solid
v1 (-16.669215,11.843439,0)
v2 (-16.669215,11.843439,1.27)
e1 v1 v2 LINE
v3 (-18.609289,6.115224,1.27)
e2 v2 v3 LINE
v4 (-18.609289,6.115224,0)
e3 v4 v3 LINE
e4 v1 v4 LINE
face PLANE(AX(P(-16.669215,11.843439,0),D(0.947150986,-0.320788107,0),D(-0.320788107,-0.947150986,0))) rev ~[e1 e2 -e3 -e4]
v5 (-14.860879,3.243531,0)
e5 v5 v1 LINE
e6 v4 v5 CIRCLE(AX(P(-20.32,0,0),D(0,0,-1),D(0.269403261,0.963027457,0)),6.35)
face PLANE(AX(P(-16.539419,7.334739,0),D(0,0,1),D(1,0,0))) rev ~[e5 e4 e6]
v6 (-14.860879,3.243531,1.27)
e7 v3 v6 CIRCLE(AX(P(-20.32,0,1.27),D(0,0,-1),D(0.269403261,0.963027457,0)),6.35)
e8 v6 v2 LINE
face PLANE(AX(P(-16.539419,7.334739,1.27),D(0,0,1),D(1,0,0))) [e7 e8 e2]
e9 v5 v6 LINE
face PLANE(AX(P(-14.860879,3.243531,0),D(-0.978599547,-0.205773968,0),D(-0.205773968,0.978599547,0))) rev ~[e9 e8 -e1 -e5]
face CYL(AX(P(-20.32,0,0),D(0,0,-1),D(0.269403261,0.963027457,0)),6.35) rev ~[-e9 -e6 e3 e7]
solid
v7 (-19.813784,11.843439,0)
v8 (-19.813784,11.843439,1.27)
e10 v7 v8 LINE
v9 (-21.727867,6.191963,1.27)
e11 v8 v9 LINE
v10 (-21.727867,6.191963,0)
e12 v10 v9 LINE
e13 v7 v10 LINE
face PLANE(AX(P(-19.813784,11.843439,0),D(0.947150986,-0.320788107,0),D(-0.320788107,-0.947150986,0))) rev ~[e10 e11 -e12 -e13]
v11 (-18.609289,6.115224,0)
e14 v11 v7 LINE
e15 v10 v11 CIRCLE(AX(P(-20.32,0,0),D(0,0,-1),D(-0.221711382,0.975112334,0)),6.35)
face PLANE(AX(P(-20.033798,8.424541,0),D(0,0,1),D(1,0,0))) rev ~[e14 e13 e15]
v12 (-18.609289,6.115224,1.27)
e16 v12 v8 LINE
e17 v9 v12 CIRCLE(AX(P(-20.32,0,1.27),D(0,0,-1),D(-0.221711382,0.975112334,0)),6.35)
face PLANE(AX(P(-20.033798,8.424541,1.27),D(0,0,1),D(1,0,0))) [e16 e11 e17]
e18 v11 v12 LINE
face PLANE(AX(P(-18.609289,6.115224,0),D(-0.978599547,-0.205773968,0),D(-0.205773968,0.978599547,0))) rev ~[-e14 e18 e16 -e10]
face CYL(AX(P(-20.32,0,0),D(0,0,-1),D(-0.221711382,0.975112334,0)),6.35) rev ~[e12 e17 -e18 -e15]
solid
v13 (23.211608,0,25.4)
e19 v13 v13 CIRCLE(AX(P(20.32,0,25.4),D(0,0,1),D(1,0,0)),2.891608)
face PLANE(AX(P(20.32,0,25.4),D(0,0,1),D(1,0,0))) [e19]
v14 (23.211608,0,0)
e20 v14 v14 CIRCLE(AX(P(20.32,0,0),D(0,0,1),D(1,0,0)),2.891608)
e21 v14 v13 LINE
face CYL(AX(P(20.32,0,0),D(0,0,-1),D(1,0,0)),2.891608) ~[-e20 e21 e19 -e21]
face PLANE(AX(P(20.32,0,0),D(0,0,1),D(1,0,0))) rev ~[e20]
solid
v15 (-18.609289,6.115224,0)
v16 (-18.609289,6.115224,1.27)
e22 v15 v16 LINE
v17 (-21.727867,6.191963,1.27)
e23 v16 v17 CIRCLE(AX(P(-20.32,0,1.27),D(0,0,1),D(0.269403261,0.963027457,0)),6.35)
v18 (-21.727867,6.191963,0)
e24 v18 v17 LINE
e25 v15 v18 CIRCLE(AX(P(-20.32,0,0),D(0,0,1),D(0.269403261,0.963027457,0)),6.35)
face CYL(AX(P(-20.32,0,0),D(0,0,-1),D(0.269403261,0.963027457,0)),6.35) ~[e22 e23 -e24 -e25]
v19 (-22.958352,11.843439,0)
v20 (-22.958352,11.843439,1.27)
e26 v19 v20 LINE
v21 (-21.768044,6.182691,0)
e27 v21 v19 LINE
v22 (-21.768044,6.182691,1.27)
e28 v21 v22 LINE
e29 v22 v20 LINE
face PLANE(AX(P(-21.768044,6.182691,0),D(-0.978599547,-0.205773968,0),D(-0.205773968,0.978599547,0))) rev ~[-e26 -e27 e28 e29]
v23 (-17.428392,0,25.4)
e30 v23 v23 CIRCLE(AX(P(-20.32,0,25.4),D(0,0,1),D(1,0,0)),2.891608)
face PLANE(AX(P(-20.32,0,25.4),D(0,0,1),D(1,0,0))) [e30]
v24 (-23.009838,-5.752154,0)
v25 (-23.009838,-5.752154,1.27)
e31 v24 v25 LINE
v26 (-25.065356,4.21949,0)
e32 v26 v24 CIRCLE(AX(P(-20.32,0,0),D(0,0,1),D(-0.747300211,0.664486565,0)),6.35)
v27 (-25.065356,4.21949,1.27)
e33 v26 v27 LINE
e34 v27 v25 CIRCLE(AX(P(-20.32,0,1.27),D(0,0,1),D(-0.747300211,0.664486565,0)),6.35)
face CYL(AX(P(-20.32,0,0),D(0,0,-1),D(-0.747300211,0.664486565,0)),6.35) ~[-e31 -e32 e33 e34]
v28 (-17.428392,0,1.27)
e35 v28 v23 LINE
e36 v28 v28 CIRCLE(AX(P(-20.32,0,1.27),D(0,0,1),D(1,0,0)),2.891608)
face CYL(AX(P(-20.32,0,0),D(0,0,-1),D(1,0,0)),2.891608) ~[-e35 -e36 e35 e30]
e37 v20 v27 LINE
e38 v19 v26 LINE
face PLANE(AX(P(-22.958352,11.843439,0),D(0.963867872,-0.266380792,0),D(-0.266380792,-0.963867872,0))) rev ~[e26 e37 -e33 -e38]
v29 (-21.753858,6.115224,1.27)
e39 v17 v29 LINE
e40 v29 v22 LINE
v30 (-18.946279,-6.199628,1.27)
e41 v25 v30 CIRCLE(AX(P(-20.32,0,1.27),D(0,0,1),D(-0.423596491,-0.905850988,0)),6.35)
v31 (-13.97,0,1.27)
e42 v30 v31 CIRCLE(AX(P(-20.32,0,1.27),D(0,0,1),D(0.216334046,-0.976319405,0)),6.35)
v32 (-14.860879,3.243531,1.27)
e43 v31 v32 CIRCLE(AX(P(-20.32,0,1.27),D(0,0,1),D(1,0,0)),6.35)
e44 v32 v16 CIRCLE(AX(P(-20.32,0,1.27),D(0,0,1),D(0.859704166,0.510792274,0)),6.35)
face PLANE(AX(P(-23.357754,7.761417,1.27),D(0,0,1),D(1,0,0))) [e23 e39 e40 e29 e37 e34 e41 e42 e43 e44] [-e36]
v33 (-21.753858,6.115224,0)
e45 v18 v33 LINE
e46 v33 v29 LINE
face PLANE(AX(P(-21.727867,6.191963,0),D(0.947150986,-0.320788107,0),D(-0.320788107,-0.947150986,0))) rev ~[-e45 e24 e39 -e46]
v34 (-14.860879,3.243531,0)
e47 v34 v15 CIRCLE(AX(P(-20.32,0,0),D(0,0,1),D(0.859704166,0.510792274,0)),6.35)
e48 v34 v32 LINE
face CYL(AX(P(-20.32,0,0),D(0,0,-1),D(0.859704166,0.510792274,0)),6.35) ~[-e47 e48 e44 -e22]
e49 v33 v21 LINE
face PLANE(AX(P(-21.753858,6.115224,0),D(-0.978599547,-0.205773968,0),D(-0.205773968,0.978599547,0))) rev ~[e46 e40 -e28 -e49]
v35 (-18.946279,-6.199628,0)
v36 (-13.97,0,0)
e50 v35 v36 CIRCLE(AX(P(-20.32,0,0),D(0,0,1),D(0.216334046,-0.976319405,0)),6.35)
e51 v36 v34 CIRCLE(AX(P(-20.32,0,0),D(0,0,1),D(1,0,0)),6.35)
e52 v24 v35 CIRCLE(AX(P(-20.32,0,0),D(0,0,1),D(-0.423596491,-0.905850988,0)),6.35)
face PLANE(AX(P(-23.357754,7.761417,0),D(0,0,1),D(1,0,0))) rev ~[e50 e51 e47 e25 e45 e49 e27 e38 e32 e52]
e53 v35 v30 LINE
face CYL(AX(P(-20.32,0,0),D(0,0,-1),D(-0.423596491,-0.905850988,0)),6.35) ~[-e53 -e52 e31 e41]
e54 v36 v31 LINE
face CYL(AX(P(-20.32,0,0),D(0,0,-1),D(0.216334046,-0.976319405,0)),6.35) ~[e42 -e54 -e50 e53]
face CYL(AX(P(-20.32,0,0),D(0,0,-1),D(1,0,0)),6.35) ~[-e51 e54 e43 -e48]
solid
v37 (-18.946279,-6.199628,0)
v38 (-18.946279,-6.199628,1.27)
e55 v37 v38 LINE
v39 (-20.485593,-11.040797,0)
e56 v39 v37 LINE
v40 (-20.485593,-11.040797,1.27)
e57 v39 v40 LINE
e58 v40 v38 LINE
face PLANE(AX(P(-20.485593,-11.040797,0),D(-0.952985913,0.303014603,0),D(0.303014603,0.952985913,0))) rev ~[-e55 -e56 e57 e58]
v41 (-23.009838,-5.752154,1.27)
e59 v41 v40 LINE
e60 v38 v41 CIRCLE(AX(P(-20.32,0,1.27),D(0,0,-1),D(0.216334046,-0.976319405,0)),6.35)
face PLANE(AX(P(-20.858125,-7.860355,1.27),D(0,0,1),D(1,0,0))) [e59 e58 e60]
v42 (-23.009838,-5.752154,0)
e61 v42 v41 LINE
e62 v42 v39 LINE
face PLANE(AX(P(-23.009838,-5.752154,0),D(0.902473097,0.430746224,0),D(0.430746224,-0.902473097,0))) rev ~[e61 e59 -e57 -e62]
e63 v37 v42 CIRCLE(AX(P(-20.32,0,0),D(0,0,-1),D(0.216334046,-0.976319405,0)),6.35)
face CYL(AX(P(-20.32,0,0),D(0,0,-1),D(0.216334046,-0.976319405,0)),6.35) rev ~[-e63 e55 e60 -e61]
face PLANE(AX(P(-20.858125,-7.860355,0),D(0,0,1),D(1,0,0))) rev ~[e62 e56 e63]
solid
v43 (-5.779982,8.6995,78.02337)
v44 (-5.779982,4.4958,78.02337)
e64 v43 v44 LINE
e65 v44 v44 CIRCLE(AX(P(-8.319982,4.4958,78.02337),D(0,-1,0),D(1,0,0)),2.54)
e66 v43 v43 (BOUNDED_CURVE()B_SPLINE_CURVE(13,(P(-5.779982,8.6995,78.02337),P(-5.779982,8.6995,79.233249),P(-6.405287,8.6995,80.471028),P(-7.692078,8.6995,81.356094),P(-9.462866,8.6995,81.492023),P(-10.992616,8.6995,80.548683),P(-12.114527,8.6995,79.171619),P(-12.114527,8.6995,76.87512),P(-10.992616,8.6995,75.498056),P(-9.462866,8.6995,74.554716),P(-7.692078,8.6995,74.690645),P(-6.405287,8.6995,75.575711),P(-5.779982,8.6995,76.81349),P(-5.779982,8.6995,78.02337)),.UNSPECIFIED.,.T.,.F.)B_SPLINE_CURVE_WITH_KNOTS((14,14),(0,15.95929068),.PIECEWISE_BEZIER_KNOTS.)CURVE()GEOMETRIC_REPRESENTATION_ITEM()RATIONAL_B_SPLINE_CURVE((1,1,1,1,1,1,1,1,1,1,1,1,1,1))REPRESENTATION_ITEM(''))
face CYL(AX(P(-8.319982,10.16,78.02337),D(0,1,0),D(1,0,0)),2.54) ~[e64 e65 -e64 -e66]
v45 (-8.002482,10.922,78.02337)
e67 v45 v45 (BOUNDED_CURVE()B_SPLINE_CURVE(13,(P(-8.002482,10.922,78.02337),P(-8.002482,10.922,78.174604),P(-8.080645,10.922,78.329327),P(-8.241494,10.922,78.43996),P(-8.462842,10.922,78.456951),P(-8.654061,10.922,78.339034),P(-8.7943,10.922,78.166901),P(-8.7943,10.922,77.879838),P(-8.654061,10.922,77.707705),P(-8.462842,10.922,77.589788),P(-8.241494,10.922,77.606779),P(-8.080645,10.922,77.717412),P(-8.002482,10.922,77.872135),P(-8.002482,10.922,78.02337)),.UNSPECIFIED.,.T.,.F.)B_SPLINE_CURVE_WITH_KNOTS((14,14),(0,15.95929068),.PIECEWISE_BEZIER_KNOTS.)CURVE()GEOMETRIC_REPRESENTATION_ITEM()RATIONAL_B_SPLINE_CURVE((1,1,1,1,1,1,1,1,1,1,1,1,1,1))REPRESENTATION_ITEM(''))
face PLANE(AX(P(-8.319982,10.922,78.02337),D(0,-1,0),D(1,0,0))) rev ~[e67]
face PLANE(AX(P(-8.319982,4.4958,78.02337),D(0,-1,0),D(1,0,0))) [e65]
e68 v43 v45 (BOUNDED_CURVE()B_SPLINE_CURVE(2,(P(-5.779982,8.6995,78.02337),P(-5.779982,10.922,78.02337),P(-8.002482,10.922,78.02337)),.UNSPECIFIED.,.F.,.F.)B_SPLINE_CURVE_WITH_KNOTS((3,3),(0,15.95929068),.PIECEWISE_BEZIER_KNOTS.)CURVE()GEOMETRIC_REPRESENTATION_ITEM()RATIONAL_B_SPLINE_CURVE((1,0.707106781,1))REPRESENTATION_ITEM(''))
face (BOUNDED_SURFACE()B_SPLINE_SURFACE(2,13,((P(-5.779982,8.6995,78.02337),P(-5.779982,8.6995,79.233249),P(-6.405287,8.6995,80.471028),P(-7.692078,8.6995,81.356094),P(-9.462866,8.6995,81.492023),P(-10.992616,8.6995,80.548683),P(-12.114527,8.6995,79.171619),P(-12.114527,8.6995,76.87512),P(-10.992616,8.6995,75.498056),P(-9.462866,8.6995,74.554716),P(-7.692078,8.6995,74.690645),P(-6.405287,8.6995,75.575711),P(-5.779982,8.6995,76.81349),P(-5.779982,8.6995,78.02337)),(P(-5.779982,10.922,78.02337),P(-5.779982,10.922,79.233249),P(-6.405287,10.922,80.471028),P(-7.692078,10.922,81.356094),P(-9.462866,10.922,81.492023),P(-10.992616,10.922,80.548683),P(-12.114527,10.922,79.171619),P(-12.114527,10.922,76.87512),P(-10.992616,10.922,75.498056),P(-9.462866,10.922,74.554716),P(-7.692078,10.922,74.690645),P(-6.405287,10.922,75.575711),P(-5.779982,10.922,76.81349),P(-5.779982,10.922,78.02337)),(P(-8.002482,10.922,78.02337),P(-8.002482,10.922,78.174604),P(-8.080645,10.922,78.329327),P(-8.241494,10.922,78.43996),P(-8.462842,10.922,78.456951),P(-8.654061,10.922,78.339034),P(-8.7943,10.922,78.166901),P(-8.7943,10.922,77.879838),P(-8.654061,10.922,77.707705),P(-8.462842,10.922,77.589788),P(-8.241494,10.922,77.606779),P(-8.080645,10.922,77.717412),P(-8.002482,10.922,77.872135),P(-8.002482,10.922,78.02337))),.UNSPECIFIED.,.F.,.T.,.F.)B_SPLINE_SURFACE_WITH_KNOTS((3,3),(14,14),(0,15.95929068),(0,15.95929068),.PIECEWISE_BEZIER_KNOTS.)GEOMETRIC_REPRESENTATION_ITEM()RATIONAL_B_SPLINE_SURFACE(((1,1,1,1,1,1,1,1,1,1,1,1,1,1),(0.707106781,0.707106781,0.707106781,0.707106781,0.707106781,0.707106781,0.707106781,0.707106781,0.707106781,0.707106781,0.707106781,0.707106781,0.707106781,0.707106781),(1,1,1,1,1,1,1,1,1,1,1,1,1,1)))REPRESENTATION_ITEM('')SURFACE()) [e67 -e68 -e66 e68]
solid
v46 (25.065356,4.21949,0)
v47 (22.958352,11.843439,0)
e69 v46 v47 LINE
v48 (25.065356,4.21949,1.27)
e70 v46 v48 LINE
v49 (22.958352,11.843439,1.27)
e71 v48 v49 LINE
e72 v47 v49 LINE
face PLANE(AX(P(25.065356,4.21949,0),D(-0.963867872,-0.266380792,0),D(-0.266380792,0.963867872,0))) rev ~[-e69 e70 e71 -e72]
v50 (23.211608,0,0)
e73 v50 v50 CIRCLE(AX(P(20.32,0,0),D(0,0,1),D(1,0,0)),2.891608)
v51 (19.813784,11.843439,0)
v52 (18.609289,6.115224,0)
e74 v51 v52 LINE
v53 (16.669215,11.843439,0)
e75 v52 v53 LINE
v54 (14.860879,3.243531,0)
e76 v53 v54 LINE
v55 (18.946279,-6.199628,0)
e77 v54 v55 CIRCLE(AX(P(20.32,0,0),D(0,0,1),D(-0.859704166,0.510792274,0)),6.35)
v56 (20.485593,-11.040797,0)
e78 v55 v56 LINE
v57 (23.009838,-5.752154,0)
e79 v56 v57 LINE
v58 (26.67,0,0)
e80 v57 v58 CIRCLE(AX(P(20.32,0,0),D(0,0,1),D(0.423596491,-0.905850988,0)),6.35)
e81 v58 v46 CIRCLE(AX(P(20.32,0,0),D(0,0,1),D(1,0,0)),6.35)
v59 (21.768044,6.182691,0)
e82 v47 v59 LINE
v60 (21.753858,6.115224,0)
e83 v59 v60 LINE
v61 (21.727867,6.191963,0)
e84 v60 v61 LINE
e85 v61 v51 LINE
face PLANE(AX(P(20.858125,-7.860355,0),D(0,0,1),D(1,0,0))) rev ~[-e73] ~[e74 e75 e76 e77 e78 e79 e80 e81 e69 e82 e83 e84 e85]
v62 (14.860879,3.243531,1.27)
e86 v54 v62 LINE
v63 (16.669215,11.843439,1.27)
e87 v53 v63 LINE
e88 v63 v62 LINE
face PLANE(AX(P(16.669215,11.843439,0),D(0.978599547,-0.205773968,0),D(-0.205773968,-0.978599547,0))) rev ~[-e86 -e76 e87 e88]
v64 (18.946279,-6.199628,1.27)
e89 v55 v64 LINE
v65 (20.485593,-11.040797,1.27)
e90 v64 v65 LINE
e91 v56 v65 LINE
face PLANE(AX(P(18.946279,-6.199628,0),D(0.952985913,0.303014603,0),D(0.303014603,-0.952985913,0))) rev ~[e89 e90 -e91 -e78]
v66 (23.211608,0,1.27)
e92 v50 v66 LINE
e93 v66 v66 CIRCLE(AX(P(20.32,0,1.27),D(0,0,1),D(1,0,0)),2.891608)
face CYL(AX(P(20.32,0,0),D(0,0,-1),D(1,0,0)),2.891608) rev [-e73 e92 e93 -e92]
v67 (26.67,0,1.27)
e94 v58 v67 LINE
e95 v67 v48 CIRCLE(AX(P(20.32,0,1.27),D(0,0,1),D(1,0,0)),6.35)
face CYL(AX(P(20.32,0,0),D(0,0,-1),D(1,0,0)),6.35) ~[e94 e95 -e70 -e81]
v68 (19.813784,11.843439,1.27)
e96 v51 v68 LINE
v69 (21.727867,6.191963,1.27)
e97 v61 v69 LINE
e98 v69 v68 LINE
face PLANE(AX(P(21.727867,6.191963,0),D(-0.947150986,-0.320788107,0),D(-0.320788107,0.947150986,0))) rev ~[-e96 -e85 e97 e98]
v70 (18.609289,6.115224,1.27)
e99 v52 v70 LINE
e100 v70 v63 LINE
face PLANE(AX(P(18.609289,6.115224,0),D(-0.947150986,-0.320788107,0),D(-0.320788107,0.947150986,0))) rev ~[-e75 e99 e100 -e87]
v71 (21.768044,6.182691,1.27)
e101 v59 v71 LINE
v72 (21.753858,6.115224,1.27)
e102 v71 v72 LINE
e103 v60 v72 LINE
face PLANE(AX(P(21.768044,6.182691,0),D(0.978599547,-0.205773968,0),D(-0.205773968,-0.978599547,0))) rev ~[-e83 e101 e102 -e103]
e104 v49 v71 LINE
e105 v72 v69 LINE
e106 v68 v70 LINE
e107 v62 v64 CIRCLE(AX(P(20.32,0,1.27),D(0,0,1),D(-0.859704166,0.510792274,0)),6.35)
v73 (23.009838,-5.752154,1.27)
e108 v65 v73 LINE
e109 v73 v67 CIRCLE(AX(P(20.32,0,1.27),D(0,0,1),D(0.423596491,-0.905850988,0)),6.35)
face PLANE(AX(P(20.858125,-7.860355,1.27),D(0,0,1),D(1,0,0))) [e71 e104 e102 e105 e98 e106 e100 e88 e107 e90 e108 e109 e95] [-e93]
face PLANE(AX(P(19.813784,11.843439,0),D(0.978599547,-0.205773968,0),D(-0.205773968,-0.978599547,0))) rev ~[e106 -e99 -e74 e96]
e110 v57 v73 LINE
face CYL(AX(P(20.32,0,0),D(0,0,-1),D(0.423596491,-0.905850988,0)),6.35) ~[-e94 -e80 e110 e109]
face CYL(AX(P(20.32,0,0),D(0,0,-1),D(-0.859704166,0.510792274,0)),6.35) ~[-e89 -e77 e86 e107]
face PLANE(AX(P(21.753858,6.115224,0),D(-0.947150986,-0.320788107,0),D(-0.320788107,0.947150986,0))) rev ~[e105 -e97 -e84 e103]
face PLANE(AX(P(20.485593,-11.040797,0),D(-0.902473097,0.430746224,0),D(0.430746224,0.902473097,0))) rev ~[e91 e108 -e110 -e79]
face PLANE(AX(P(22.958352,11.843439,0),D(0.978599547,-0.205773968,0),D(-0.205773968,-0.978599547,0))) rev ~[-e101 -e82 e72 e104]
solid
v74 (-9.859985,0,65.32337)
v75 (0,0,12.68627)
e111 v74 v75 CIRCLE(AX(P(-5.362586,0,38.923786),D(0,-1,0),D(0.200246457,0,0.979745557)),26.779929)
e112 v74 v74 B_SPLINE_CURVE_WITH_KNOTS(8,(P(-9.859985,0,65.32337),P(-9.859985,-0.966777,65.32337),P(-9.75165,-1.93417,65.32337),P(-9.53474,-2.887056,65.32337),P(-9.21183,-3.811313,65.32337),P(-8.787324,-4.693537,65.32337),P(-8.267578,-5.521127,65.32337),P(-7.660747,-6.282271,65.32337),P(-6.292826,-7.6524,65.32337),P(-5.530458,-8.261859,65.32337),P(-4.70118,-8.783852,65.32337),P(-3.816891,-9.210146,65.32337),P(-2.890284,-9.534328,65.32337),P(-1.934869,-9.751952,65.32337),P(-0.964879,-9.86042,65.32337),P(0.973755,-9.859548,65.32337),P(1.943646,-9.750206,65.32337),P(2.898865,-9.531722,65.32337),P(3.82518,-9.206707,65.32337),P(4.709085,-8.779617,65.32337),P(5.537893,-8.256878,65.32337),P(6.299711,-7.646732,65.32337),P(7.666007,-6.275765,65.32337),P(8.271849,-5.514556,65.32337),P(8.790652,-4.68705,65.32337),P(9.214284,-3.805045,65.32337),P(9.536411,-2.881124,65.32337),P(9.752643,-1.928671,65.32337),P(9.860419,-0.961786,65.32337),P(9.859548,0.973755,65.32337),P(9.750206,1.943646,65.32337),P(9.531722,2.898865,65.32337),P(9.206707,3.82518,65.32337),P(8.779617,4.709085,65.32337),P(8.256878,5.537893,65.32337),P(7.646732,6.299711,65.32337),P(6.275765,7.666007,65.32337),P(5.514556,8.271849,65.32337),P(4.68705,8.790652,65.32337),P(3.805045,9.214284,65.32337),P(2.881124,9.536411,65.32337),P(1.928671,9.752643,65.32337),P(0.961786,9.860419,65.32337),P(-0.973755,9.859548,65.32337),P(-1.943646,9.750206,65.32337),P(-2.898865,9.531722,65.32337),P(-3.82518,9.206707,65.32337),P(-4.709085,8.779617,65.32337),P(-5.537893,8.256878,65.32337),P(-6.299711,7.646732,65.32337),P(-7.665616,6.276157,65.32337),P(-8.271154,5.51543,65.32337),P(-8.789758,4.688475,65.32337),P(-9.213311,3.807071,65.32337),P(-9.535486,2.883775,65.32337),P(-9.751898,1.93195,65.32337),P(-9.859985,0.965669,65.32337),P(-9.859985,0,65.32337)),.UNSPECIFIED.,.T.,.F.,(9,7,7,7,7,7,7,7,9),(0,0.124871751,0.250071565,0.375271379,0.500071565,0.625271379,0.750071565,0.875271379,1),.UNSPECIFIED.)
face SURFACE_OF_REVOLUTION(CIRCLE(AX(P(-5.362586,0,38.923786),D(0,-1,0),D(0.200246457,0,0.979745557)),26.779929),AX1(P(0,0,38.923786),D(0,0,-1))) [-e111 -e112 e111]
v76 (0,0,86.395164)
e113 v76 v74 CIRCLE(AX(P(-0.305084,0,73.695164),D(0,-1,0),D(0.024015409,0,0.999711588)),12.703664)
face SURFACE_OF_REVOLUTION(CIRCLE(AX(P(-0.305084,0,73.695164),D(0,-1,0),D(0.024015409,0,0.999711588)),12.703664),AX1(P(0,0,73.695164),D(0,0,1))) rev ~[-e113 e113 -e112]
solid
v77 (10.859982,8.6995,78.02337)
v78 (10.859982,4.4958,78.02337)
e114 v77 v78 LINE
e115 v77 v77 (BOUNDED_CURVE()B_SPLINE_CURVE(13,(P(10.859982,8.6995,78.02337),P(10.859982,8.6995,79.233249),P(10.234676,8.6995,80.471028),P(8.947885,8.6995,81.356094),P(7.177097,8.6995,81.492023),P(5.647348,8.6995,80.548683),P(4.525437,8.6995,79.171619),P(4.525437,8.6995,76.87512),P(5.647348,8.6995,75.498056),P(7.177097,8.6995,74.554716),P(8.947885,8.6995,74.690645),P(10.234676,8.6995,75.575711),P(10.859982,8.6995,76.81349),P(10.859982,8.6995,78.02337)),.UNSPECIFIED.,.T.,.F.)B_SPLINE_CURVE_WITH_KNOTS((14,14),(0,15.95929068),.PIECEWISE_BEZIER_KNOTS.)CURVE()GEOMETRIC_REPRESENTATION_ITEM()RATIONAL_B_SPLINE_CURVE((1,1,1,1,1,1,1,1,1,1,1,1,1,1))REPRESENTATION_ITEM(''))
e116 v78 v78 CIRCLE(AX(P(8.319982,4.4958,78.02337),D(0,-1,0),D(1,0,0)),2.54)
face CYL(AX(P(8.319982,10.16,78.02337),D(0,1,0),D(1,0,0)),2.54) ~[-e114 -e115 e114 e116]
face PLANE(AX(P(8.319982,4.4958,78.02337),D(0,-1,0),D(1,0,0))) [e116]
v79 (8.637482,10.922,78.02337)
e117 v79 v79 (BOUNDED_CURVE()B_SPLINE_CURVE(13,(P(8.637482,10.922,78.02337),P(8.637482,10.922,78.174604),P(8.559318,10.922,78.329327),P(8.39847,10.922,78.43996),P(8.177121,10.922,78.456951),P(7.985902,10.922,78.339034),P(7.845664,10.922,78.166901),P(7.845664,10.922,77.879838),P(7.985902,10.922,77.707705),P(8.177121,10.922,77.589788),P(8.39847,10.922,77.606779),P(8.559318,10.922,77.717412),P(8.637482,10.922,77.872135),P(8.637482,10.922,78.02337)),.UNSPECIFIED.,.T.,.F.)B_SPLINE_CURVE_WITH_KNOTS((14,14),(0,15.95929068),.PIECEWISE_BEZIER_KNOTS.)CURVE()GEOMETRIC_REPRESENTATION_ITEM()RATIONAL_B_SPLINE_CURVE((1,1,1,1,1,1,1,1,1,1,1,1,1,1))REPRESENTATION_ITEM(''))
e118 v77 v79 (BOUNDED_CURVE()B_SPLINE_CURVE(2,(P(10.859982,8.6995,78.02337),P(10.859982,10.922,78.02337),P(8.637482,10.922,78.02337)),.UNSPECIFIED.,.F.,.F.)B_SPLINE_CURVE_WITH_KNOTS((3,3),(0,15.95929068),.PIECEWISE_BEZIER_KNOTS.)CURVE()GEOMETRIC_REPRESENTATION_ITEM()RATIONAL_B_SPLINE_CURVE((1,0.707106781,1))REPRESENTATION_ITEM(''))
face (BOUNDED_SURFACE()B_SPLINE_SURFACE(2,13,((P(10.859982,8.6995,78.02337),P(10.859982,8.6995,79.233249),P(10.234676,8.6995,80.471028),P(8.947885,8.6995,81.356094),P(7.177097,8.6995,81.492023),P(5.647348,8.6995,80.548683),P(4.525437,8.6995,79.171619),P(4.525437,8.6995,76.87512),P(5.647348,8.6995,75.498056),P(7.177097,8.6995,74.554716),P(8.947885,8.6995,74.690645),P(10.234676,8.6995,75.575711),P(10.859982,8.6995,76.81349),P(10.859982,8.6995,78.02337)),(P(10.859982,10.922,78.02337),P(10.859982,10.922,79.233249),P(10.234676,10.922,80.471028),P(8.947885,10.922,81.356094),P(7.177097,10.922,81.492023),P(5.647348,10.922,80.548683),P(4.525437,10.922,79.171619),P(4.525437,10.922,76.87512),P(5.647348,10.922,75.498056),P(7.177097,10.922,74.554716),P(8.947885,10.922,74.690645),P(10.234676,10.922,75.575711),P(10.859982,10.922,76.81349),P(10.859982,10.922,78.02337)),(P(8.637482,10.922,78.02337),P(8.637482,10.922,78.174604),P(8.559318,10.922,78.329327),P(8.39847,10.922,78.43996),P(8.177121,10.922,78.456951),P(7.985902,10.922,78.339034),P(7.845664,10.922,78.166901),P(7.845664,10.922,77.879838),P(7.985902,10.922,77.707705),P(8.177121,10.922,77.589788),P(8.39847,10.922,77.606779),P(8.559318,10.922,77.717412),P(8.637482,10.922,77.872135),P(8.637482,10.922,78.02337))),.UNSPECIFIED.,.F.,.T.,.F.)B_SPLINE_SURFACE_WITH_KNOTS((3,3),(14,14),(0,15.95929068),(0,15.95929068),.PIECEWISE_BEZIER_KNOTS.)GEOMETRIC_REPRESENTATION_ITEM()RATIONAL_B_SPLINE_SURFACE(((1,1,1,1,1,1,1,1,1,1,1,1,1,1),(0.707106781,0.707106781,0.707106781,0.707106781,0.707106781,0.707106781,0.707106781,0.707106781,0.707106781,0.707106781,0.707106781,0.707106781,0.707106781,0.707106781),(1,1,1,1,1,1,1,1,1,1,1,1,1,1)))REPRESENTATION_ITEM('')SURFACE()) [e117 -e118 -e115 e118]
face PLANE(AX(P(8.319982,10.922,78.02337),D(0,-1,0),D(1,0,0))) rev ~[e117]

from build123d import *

# Parameters (mm, degrees)
F0_R           = 2.8916080187
F1_DEPTH       = 25.4
F4_DEPTH       = 1.27
F5_DEPTH       = 1.27
F6_DEPTH       = 1.27
F14_R          = 2.54
F15_DEPTH      = 0.762
F15_DEPTH_BACK = 5.6642
F16_R          = 2.2225
F16_2_R        = 2.2225


# Not quite as in the source:
# - the program builds the solid bodies; features that only make, move or delete a surface that nothing else refers to are left out


with BuildPart() as f1:
    # F0 (on Top) → F1 (new body)
    with BuildSketch(Plane.XY):
        with Locations((-20.32, 0)):
            Circle(F0_R)
    extrude(amount=F1_DEPTH)

    # F0 (on Top) → F4 (join)
    with BuildSketch(Plane.XY):
        with BuildLine():
            ThreePointArc((-18.9462788097, -6.199628222), (-15.3679484273, -3.974881787), (-13.97, 0))
            ThreePointArc((-13.97, 0), (-14.1967687766, 1.6818262053), (-14.8608785464, 3.2435309394))
            ThreePointArc((-14.8608785464, 3.2435309394), (-16.4582285071, 5.0407559886), (-18.6092892941, 6.1152243524))
            ThreePointArc((-18.6092892941, 6.1152243524), (-20.1637925957, 6.3480783901), (-21.7278672749, 6.1919633184))
            Line((-21.7278672749, 6.1919633184), (-21.7538577959, 6.1152243524))
            Line((-21.7538577959, 6.1152243524), (-21.7680442692, 6.1826909833))
            ThreePointArc((-21.7680442692, 6.1826909833), (-23.5685523861, 5.4561348402), (-25.0653563388, 4.2194896869))
            ThreePointArc((-25.0653563388, 4.2194896869), (-26.5392399855, -1.2820117015), (-23.0098377174, -5.7521537753))
            ThreePointArc((-23.0098377174, -5.7521537753), (-21.0150532522, -6.3118460831), (-18.9462788097, -6.199628222))
        make_face()
        with Locations((-20.32, 0)):
            Circle(F0_R, mode=Mode.SUBTRACT)
    extrude(amount=F4_DEPTH)

    # F0 (on Top) → F5 (join)
    with BuildSketch(Plane.XY):
        with BuildLine():
            Line((-22.9583520449, 11.8434393375), (-25.0653563388, 4.2194896869))
            ThreePointArc((-25.0653563388, 4.2194896869), (-23.5685523861, 5.4561348402), (-21.7680442692, 6.1826909833))
            Line((-21.7680442692, 6.1826909833), (-22.9583520449, 11.8434393375))
        make_face()
    extrude(amount=F5_DEPTH)


with BuildPart() as f1b:
    # F0 (on Top) → F1, piece 2 (new body)
    with BuildSketch(Plane.XY):
        with Locations((20.32, 0)):
            Circle(F0_R)
    extrude(amount=F1_DEPTH)


with BuildPart() as f3:
    # F2 (on Front) → F3 (revolve)
    with BuildSketch(Plane.XZ):
        with BuildLine():
            Line((0, 12.6862702891), (0, 65.1613026857))
            ThreePointArc((0, 65.1613026857), (-32.1425145903, 38.9237864874), (0, 12.6862702891))
        make_face()
    revolve(axis=Axis((0, 0, 38.9237864874), (0, 0, -1)))

    # F7 (on Front) → F8 (revolve)
    with BuildSketch(Plane.XZ):
        with BuildLine():
            ThreePointArc((0, 86.3951636095), (-13.0087475703, 73.6951636095), (0, 60.9951636095))
            Line((0, 60.9951636095), (0, 86.3951636095))
        make_face()
    revolve(axis=Axis((0, 0, 73.6951636095), (0, 0, 1)))


with BuildPart() as f6:
    # F0 (on Top) → F6 (new body)
    with BuildSketch(Plane.XY):
        with BuildLine():
            ThreePointArc((-21.7278672749, 6.1919633184), (-20.1637925957, 6.3480783901), (-18.6092892941, 6.1152243524))
            Line((-18.6092892941, 6.1152243524), (-19.813783543, 11.8434393375))
            Line((-19.813783543, 11.8434393375), (-21.7278672749, 6.1919633184))
        make_face()
    extrude(amount=F6_DEPTH)


with BuildPart() as f6b:
    # F0 (on Top) → F6, piece 2 (new body)
    with BuildSketch(Plane.XY):
        with BuildLine():
            ThreePointArc((-18.6092892941, 6.1152243524), (-16.4582285071, 5.0407559886), (-14.8608785464, 3.2435309394))
            Line((-14.8608785464, 3.2435309394), (-16.6692150412, 11.8434393375))
            Line((-16.6692150412, 11.8434393375), (-18.6092892941, 6.1152243524))
        make_face()
    extrude(amount=F6_DEPTH)


with BuildPart() as f6c:
    # F0 (on Top) → F6, piece 3 (new body)
    with BuildSketch(Plane.XY):
        with BuildLine():
            Line((-20.4855929921, -11.0407966603), (-18.9462788097, -6.199628222))
            ThreePointArc((-18.9462788097, -6.199628222), (-21.0150532522, -6.3118460831), (-23.0098377174, -5.7521537753))
            Line((-23.0098377174, -5.7521537753), (-20.4855929921, -11.0407966603))
        make_face()
    extrude(amount=F6_DEPTH)


with BuildPart() as f6d:
    # F0 (on Top) → F6, piece 4 (new body)
    with BuildSketch(Plane.XY):
        with BuildLine():
            ThreePointArc((23.0098377174, -5.7521537753), (21.0150532522, -6.3118460831), (18.9462788097, -6.199628222))
            Line((18.9462788097, -6.199628222), (20.4855929921, -11.0407966603))
            Line((20.4855929921, -11.0407966603), (23.0098377174, -5.7521537753))
        make_face()
        with BuildLine():
            Line((16.6692150412, 11.8434393375), (14.8608785464, 3.2435309394))
            ThreePointArc((14.8608785464, 3.2435309394), (16.4582285071, 5.0407559886), (18.6092892941, 6.1152243524))
            Line((18.6092892941, 6.1152243524), (16.6692150412, 11.8434393375))
        make_face()
        with BuildLine():
            Line((19.813783543, 11.8434393375), (18.6092892941, 6.1152243524))
            ThreePointArc((18.6092892941, 6.1152243524), (20.1637925957, 6.3480783901), (21.7278672749, 6.1919633184))
            Line((21.7278672749, 6.1919633184), (19.813783543, 11.8434393375))
        make_face()
        with BuildLine():
            ThreePointArc((14.8608785464, 3.2435309394), (14.4920287933, -2.5213590807), (18.9462788097, -6.199628222))
            ThreePointArc((18.9462788097, -6.199628222), (21.0150532522, -6.3118460831), (23.0098377174, -5.7521537753))
            ThreePointArc((23.0098377174, -5.7521537753), (25.677376667, -3.4089610217), (26.67, 0))
            ThreePointArc((26.67, 0), (26.2552974968, 2.257153877), (25.0653563388, 4.2194896869))
            ThreePointArc((25.0653563388, 4.2194896869), (23.5685523861, 5.4561348402), (21.7680442692, 6.1826909833))
            Line((21.7680442692, 6.1826909833), (21.7538577959, 6.1152243524))
            Line((21.7538577959, 6.1152243524), (21.7278672749, 6.1919633184))
            ThreePointArc((21.7278672749, 6.1919633184), (20.1637925957, 6.3480783901), (18.6092892941, 6.1152243524))
            ThreePointArc((18.6092892941, 6.1152243524), (16.4582285071, 5.0407559886), (14.8608785464, 3.2435309394))
        make_face()
        with Locations((20.32, 0)):
            Circle(F0_R, mode=Mode.SUBTRACT)
        with BuildLine():
            ThreePointArc((21.7680442692, 6.1826909833), (23.5685523861, 5.4561348402), (25.0653563388, 4.2194896869))
            Line((25.0653563388, 4.2194896869), (22.9583520449, 11.8434393375))
            Line((22.9583520449, 11.8434393375), (21.7680442692, 6.1826909833))
        make_face()
    extrude(amount=F6_DEPTH)


with BuildPart() as f15:
    # F14 (on offset) → F15 (new body, two sides)
    with BuildSketch(Plane.XZ.offset(-10.16)) as f15_sk:
        with Locations((8.3199816652, 78.0233695126)):
            Circle(F14_R)
    extrude(amount=-F15_DEPTH)
    extrude(f15_sk.sketch, amount=F15_DEPTH_BACK)

    # F16
    f16_edges = [f15.edges().sort_by_distance(p)[0] for p in [
        (5.779982, 10.922, 78.02337),
    ]]
    fillet(f16_edges, radius=F16_R)


with BuildPart() as f15b:
    # F14 (on offset) → F15, piece 2 (new body, two sides)
    with BuildSketch(Plane.XZ.offset(-10.16)) as f15_2_sk:
        with Locations((-8.3199816652, 78.0233695126)):
            Circle(F14_R)
    extrude(amount=-F15_DEPTH)
    extrude(f15_2_sk.sketch, amount=F15_DEPTH_BACK)

    # F16#2
    f16_2_edges = [f15b.edges().sort_by_distance(p)[0] for p in [
        (-10.859982, 10.922, 78.02337),
    ]]
    fillet(f16_2_edges, radius=F16_2_R)


solid = Compound([f1.part, f1b.part, f3.part, f6.part, f6b.part, f6c.part, f6d.part, f15.part, f15b.part])
